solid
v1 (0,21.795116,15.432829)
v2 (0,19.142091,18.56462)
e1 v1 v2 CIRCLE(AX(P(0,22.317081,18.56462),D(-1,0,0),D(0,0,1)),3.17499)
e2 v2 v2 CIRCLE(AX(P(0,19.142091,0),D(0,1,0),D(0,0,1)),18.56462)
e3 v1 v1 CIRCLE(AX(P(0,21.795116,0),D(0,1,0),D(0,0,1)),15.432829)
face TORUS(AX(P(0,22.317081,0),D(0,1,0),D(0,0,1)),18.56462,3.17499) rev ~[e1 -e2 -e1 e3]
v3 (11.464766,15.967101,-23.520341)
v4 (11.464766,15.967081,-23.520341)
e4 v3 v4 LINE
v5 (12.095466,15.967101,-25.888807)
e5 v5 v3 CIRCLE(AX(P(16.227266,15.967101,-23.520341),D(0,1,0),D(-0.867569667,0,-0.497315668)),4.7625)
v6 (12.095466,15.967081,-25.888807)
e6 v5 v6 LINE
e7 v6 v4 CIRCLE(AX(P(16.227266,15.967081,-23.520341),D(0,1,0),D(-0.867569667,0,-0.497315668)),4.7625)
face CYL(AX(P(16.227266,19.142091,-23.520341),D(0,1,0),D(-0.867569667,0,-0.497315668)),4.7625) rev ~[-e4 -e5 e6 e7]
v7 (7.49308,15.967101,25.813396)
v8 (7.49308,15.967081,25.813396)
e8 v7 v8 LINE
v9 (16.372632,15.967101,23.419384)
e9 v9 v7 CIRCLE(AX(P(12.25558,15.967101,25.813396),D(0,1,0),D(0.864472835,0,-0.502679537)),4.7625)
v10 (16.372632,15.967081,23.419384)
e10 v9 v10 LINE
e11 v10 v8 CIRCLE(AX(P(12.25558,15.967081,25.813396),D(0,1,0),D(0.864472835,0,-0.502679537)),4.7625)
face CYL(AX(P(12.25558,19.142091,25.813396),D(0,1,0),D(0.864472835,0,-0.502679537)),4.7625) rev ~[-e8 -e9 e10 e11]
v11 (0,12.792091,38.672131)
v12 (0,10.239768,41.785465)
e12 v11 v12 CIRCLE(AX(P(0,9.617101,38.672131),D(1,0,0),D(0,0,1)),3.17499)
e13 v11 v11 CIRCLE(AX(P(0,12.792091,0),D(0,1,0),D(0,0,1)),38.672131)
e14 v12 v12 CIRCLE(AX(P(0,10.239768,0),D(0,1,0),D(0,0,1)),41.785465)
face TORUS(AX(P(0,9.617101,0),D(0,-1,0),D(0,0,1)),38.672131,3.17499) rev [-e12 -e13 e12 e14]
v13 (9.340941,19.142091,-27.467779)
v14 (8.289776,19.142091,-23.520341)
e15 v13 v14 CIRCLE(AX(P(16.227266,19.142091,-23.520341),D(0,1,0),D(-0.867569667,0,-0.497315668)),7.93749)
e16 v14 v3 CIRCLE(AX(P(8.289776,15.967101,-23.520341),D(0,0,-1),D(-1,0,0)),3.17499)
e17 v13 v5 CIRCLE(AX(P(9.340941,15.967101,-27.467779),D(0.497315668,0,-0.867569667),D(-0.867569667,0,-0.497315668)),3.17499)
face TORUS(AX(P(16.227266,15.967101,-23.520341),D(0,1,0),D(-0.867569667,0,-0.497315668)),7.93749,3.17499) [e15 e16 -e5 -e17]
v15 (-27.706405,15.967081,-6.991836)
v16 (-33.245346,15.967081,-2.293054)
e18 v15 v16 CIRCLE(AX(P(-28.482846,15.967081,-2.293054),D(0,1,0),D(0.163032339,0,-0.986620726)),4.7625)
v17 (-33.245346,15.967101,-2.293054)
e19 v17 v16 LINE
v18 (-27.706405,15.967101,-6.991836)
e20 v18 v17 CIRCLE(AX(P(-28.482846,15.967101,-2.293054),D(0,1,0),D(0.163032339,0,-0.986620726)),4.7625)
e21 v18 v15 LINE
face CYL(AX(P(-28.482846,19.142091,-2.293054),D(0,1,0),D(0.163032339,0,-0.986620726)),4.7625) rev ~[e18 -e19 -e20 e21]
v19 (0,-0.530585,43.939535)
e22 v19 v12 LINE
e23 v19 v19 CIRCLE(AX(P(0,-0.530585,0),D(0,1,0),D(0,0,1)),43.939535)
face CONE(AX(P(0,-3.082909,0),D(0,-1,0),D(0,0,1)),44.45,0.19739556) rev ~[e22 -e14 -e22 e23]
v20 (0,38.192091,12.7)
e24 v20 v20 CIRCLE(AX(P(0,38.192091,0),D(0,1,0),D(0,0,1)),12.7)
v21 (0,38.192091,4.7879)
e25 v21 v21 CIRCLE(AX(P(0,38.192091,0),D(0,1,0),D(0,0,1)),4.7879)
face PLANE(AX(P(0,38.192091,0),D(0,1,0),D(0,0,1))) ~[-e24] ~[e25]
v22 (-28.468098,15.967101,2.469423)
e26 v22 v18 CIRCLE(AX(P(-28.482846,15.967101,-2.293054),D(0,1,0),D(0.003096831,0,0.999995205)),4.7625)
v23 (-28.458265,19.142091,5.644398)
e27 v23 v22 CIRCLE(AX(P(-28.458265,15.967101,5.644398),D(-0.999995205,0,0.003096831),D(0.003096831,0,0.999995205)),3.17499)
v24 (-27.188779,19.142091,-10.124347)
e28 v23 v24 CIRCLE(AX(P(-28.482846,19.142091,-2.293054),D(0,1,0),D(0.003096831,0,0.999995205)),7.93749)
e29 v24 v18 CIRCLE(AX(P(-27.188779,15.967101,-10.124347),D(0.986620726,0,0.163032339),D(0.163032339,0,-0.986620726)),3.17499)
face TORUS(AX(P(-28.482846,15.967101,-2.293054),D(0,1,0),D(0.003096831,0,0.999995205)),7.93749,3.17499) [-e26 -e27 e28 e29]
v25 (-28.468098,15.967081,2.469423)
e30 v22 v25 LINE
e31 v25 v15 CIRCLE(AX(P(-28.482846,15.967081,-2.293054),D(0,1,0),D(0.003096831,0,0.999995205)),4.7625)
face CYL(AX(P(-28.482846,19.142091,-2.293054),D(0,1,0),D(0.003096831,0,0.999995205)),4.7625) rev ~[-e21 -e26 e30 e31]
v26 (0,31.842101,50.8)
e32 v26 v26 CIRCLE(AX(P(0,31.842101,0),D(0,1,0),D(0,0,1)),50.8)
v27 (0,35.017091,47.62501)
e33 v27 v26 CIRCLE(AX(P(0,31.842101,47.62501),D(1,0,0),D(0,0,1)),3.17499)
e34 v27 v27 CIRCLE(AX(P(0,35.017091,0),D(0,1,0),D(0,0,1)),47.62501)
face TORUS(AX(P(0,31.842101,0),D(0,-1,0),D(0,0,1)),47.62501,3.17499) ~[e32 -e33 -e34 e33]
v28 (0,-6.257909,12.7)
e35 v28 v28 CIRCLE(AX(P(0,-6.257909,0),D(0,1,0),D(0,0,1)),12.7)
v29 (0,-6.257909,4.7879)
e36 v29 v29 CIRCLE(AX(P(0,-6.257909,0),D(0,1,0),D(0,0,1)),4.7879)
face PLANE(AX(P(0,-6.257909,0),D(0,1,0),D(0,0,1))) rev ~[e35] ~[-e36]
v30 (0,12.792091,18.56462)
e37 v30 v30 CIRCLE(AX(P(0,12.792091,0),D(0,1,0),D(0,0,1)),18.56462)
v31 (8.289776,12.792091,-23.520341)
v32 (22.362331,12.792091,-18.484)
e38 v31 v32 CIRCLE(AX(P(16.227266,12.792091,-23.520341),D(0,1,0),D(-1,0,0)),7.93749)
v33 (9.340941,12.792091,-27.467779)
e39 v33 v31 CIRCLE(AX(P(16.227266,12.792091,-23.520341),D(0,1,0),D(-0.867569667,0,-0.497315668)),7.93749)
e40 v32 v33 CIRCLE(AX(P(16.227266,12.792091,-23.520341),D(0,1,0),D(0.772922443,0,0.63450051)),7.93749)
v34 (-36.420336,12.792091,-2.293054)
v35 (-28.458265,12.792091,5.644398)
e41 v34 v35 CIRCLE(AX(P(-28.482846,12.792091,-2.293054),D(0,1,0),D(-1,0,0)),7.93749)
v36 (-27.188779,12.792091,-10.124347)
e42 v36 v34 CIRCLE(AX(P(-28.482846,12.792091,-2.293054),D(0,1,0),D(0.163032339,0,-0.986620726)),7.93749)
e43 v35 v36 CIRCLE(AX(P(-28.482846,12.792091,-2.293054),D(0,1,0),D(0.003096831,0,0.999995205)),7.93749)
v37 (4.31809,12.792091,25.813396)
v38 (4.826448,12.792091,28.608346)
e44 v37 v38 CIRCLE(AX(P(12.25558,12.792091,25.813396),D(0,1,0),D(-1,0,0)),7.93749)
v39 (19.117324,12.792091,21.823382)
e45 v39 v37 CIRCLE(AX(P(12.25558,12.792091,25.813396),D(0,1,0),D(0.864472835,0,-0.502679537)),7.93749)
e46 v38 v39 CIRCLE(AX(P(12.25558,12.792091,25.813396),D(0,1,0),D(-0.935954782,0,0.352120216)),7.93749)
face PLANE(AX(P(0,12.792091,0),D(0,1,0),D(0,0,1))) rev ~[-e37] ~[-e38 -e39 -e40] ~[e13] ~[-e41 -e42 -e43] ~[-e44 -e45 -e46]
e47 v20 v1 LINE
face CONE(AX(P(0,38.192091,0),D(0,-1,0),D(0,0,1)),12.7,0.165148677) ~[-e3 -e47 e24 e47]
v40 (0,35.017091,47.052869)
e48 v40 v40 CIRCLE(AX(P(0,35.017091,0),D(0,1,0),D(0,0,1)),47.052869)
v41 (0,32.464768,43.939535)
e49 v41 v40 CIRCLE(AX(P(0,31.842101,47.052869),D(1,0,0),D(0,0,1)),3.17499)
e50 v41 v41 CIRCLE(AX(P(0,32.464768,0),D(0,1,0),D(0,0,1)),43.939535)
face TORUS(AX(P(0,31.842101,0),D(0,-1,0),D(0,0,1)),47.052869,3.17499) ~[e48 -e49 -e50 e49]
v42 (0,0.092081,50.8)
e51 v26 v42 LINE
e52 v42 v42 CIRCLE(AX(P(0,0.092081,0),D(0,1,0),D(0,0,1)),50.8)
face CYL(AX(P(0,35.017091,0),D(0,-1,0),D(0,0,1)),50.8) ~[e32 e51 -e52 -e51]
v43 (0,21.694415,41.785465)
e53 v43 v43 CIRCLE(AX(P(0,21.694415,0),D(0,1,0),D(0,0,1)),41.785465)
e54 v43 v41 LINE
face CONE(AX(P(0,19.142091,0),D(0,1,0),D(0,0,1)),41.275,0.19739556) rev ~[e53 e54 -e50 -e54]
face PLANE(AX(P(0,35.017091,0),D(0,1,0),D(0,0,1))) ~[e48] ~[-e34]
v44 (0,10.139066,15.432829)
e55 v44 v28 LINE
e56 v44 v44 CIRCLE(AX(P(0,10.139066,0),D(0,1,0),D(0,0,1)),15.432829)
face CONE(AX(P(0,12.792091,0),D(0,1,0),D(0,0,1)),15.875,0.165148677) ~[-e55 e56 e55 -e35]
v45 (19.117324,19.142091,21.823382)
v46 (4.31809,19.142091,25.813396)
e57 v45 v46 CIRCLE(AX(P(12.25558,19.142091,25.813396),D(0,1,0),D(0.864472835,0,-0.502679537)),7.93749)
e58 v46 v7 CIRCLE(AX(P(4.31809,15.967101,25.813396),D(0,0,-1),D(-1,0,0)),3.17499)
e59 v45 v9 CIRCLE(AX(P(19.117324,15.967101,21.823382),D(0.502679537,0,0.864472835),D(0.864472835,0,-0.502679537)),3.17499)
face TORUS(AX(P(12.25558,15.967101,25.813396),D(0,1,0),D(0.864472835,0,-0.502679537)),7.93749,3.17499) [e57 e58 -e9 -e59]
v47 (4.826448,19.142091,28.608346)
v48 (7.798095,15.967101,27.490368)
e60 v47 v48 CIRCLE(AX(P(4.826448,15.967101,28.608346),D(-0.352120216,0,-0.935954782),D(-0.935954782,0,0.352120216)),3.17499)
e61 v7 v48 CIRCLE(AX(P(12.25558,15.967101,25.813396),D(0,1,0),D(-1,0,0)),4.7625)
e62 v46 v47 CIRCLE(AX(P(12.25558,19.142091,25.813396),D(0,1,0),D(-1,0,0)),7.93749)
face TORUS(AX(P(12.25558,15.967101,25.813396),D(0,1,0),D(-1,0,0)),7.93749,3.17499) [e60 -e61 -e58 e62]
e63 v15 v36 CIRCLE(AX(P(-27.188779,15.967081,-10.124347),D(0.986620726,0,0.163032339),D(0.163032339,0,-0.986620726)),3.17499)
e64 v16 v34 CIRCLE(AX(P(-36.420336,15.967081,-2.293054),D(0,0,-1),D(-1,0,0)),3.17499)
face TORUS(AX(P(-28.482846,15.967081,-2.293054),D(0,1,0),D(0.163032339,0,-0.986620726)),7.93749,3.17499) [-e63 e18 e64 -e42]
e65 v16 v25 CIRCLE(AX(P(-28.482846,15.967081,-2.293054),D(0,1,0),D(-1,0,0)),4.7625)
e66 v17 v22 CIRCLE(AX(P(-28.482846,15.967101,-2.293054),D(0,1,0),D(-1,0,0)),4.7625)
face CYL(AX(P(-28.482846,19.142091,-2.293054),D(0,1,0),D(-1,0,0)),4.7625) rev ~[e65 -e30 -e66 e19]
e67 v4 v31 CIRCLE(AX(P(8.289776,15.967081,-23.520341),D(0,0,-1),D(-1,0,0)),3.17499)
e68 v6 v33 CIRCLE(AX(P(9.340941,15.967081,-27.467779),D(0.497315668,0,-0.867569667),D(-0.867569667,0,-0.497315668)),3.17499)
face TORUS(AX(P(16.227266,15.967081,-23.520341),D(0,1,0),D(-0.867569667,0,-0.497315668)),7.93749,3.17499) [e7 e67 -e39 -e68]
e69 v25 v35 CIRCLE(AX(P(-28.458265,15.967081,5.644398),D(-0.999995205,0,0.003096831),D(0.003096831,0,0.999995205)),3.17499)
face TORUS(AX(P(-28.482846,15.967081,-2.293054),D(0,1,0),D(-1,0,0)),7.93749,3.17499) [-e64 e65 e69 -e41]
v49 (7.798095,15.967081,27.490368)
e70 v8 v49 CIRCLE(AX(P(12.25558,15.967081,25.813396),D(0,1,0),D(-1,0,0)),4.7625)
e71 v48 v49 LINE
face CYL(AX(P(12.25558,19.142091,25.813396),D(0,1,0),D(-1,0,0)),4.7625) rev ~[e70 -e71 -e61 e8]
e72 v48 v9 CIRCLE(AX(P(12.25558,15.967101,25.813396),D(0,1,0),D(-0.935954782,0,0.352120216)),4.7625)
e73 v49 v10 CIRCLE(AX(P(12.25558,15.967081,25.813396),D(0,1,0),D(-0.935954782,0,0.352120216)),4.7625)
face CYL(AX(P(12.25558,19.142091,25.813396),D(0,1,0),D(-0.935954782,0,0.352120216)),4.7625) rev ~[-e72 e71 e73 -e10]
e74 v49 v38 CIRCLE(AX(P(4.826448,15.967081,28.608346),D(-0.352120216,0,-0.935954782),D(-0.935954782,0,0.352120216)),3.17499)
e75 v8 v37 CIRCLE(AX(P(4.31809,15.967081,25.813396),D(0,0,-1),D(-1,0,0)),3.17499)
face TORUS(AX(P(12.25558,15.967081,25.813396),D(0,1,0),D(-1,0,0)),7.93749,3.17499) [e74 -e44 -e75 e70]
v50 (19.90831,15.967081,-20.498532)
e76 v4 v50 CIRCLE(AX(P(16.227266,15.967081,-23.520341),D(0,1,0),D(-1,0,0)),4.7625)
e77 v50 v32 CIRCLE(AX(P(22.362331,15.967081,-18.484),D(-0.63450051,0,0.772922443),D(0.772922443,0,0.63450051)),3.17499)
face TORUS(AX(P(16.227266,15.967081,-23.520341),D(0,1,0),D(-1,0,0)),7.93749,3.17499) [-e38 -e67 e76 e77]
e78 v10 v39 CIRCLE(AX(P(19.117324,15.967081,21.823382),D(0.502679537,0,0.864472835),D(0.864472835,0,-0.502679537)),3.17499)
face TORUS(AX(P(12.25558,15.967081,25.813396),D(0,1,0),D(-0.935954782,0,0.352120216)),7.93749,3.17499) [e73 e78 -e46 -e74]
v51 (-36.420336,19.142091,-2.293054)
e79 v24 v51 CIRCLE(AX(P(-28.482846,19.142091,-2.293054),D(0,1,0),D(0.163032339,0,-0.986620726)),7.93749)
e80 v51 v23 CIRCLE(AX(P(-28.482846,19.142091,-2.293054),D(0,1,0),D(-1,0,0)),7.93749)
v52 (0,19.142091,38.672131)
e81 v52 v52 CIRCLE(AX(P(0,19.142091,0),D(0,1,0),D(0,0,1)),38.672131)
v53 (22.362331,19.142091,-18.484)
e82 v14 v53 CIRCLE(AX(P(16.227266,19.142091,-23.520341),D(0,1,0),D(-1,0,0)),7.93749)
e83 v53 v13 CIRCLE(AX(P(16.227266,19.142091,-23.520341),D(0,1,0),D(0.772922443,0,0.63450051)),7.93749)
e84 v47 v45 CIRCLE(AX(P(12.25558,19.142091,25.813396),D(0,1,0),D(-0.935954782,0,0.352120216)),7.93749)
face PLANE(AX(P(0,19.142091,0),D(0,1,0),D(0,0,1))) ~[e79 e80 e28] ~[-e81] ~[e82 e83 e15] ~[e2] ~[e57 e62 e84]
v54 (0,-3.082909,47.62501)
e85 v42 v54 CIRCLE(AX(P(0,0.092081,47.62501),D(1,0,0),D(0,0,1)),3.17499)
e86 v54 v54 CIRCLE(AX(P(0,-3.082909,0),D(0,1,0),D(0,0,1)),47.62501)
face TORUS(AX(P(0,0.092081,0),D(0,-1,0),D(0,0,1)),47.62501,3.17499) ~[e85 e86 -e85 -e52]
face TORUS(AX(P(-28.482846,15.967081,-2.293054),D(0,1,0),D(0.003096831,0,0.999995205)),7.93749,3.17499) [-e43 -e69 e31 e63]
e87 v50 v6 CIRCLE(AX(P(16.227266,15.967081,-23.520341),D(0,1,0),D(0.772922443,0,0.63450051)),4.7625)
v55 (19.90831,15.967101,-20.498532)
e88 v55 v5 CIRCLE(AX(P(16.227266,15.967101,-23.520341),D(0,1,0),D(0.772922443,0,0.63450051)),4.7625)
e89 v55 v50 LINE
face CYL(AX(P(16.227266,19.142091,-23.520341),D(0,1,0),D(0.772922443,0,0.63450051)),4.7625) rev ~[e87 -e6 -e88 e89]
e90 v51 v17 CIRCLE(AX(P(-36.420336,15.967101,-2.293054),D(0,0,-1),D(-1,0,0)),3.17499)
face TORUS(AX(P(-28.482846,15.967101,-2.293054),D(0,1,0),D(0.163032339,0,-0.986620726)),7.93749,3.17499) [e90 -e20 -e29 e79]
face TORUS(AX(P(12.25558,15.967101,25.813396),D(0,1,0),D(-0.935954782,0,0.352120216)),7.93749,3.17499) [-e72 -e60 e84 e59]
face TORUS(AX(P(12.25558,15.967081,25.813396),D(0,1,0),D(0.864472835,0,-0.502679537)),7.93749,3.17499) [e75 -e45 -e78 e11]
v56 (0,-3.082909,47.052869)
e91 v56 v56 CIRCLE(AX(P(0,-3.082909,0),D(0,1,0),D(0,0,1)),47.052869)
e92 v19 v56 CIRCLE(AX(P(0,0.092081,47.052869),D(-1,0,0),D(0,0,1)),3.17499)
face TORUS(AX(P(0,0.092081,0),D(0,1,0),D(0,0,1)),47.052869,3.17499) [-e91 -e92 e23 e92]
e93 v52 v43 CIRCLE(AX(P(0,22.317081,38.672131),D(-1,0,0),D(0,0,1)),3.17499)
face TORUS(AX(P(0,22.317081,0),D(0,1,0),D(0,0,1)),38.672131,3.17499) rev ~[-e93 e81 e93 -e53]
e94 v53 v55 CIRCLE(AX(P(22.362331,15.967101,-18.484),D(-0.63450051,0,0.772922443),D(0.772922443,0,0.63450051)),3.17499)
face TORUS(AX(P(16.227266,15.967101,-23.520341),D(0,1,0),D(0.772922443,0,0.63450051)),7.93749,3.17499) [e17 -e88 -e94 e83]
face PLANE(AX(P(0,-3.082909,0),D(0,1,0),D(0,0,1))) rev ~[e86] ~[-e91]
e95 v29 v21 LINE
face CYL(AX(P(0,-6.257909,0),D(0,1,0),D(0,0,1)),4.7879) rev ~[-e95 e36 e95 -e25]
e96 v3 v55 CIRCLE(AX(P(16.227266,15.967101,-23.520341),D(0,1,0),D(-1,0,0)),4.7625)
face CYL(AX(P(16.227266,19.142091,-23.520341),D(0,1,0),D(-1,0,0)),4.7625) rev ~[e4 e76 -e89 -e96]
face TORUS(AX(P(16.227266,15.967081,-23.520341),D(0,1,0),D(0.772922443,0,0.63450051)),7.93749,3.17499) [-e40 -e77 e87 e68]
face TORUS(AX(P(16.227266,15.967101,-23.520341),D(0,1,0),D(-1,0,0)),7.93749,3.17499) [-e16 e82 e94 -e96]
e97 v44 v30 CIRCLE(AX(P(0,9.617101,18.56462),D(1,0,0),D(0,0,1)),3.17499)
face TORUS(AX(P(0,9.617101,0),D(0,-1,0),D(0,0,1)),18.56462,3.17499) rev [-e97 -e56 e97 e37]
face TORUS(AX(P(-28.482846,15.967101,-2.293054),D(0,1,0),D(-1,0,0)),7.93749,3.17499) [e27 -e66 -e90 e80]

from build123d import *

# Parameters (mm, degrees)
F3_DEPTH = 6.35
F4_R     = 3.17499


# Not quite as in the source:
# - a fillet or chamfer is up to 0.001 mm smaller than in the source, because OpenCascade refuses the exact size


with BuildPart() as f1:
    # F0 (on Right) → F1 (revolve)
    with BuildSketch(Plane.YZ):
        Polygon((15.967091351, 50.8), (15.967091351, 4.7879), (38.192091351, 4.7879), (38.192091351, 12.7), (19.142091351, 15.875), (19.142091351, 41.275), (35.017091351, 44.45), (35.017091351, 50.8), align=None)
        Polygon((-6.257908649, 12.7), (-6.257908649, 4.7879), (15.967091351, 4.7879), (15.967091351, 50.8), (-3.082908649, 50.8), (-3.082908649, 44.45), (12.792091351, 41.275), (12.792091351, 15.875), align=None)
    revolve(axis=Axis((0, 6.442091351, 0), (0, 1, 0)))

    # F2 (on face) → F3 (cut)
    with BuildSketch(Plane(origin=(0, 19.142091351, 0), x_dir=(-1, 0, 0), z_dir=(0, 1, 0))):
        with BuildLine():
            ThreePointArc((-7.4930797023, 25.813395576), (-7.5699539763, 26.6656383857), (-7.7980950541, 27.4903681046))
            ThreePointArc((-7.7980950541, 27.4903681046), (-12.2555797023, 25.813395576), (-16.3726315809, 23.4193842813))
            ThreePointArc((-16.3726315809, 23.4193842813), (-11.0158324139, 21.2150879622), (-7.4930797023, 25.813395576))
        make_face()
        with BuildLine():
            ThreePointArc((-16.3726315809, 23.4193842813), (-12.2555797023, 25.813395576), (-7.7980950541, 27.4903681046))
            ThreePointArc((-7.7980950541, 27.4903681046), (-14.2981763193, 30.115628172), (-16.3726315809, 23.4193842813))
        make_face()
        with BuildLine():
            ThreePointArc((27.706404665, -6.9918356343), (28.3570197509, -3.5227909175), (28.575, 0))
            ThreePointArc((28.575, 0), (28.5482618701, 1.2358677908), (28.4680975191, 2.4694227352))
            ThreePointArc((28.4680975191, 2.4694227352), (23.7357051482, -1.9108786898), (27.706404665, -6.9918356343))
        make_face()
        with BuildLine():
            ThreePointArc((28.4680975191, 2.4694227352), (28.5482618701, 1.2358677908), (28.575, 0))
            ThreePointArc((28.575, 0), (28.3570197509, -3.5227909175), (27.706404665, -6.9918356343))
            ThreePointArc((27.706404665, -6.9918356343), (31.5637229642, -5.9248039342), (33.2453461779, -2.2930544277))
            ThreePointArc((33.2453461779, -2.2930544277), (31.8452237416, 1.0797520252), (28.4680975191, 2.4694227352))
        make_face()
        with BuildLine():
            ThreePointArc((-19.9083096109, -20.4985324703), (-18.9318108882, -27.4403980063), (-12.0954659382, -25.8888070165))
            ThreePointArc((-12.0954659382, -25.8888070165), (-16.2272664756, -23.5203411482), (-19.9083096109, -20.4985324703))
        make_face()
        with BuildLine():
            ThreePointArc((-19.9083096109, -20.4985324703), (-16.2272664756, -23.5203411482), (-12.0954659382, -25.8888070165))
            ThreePointArc((-12.0954659382, -25.8888070165), (-11.6251416235, -24.7458423091), (-11.4647664756, -23.5203411482))
            ThreePointArc((-11.4647664756, -23.5203411482), (-14.622517536, -19.0363488321), (-19.9083096109, -20.4985324703))
        make_face()
    extrude(amount=-F3_DEPTH, mode=Mode.SUBTRACT)

    # F4 (radius 3.175 in the source; OpenCascade refuses exactly that, so slightly less here)
    f4_edges = [f1.edges().sort_by_distance(p)[0] for p in [
        (0, 12.792091, -41.275),
        (-29.259288, 12.792091, 2.405727),
        (0, 12.792091, -15.875),
        (20.359067, 12.792091, -21.151875),
        (17.01808, 12.792091, 25.813396),
        (0, 19.142091, -41.275),
        (-29.259288, 19.142091, 2.405727),
        (17.01808, 19.142091, 25.813396),
        (0, 19.142091, -15.875),
        (20.359067, 19.142091, -21.151875),
        (0, 35.017091, -44.45),
        (0, 35.017091, -50.8),
        (0, -3.082909, -50.8),
        (0, -3.082909, -44.45),
    ]]
    fillet(f4_edges, radius=F4_R)


solid = f1.part
